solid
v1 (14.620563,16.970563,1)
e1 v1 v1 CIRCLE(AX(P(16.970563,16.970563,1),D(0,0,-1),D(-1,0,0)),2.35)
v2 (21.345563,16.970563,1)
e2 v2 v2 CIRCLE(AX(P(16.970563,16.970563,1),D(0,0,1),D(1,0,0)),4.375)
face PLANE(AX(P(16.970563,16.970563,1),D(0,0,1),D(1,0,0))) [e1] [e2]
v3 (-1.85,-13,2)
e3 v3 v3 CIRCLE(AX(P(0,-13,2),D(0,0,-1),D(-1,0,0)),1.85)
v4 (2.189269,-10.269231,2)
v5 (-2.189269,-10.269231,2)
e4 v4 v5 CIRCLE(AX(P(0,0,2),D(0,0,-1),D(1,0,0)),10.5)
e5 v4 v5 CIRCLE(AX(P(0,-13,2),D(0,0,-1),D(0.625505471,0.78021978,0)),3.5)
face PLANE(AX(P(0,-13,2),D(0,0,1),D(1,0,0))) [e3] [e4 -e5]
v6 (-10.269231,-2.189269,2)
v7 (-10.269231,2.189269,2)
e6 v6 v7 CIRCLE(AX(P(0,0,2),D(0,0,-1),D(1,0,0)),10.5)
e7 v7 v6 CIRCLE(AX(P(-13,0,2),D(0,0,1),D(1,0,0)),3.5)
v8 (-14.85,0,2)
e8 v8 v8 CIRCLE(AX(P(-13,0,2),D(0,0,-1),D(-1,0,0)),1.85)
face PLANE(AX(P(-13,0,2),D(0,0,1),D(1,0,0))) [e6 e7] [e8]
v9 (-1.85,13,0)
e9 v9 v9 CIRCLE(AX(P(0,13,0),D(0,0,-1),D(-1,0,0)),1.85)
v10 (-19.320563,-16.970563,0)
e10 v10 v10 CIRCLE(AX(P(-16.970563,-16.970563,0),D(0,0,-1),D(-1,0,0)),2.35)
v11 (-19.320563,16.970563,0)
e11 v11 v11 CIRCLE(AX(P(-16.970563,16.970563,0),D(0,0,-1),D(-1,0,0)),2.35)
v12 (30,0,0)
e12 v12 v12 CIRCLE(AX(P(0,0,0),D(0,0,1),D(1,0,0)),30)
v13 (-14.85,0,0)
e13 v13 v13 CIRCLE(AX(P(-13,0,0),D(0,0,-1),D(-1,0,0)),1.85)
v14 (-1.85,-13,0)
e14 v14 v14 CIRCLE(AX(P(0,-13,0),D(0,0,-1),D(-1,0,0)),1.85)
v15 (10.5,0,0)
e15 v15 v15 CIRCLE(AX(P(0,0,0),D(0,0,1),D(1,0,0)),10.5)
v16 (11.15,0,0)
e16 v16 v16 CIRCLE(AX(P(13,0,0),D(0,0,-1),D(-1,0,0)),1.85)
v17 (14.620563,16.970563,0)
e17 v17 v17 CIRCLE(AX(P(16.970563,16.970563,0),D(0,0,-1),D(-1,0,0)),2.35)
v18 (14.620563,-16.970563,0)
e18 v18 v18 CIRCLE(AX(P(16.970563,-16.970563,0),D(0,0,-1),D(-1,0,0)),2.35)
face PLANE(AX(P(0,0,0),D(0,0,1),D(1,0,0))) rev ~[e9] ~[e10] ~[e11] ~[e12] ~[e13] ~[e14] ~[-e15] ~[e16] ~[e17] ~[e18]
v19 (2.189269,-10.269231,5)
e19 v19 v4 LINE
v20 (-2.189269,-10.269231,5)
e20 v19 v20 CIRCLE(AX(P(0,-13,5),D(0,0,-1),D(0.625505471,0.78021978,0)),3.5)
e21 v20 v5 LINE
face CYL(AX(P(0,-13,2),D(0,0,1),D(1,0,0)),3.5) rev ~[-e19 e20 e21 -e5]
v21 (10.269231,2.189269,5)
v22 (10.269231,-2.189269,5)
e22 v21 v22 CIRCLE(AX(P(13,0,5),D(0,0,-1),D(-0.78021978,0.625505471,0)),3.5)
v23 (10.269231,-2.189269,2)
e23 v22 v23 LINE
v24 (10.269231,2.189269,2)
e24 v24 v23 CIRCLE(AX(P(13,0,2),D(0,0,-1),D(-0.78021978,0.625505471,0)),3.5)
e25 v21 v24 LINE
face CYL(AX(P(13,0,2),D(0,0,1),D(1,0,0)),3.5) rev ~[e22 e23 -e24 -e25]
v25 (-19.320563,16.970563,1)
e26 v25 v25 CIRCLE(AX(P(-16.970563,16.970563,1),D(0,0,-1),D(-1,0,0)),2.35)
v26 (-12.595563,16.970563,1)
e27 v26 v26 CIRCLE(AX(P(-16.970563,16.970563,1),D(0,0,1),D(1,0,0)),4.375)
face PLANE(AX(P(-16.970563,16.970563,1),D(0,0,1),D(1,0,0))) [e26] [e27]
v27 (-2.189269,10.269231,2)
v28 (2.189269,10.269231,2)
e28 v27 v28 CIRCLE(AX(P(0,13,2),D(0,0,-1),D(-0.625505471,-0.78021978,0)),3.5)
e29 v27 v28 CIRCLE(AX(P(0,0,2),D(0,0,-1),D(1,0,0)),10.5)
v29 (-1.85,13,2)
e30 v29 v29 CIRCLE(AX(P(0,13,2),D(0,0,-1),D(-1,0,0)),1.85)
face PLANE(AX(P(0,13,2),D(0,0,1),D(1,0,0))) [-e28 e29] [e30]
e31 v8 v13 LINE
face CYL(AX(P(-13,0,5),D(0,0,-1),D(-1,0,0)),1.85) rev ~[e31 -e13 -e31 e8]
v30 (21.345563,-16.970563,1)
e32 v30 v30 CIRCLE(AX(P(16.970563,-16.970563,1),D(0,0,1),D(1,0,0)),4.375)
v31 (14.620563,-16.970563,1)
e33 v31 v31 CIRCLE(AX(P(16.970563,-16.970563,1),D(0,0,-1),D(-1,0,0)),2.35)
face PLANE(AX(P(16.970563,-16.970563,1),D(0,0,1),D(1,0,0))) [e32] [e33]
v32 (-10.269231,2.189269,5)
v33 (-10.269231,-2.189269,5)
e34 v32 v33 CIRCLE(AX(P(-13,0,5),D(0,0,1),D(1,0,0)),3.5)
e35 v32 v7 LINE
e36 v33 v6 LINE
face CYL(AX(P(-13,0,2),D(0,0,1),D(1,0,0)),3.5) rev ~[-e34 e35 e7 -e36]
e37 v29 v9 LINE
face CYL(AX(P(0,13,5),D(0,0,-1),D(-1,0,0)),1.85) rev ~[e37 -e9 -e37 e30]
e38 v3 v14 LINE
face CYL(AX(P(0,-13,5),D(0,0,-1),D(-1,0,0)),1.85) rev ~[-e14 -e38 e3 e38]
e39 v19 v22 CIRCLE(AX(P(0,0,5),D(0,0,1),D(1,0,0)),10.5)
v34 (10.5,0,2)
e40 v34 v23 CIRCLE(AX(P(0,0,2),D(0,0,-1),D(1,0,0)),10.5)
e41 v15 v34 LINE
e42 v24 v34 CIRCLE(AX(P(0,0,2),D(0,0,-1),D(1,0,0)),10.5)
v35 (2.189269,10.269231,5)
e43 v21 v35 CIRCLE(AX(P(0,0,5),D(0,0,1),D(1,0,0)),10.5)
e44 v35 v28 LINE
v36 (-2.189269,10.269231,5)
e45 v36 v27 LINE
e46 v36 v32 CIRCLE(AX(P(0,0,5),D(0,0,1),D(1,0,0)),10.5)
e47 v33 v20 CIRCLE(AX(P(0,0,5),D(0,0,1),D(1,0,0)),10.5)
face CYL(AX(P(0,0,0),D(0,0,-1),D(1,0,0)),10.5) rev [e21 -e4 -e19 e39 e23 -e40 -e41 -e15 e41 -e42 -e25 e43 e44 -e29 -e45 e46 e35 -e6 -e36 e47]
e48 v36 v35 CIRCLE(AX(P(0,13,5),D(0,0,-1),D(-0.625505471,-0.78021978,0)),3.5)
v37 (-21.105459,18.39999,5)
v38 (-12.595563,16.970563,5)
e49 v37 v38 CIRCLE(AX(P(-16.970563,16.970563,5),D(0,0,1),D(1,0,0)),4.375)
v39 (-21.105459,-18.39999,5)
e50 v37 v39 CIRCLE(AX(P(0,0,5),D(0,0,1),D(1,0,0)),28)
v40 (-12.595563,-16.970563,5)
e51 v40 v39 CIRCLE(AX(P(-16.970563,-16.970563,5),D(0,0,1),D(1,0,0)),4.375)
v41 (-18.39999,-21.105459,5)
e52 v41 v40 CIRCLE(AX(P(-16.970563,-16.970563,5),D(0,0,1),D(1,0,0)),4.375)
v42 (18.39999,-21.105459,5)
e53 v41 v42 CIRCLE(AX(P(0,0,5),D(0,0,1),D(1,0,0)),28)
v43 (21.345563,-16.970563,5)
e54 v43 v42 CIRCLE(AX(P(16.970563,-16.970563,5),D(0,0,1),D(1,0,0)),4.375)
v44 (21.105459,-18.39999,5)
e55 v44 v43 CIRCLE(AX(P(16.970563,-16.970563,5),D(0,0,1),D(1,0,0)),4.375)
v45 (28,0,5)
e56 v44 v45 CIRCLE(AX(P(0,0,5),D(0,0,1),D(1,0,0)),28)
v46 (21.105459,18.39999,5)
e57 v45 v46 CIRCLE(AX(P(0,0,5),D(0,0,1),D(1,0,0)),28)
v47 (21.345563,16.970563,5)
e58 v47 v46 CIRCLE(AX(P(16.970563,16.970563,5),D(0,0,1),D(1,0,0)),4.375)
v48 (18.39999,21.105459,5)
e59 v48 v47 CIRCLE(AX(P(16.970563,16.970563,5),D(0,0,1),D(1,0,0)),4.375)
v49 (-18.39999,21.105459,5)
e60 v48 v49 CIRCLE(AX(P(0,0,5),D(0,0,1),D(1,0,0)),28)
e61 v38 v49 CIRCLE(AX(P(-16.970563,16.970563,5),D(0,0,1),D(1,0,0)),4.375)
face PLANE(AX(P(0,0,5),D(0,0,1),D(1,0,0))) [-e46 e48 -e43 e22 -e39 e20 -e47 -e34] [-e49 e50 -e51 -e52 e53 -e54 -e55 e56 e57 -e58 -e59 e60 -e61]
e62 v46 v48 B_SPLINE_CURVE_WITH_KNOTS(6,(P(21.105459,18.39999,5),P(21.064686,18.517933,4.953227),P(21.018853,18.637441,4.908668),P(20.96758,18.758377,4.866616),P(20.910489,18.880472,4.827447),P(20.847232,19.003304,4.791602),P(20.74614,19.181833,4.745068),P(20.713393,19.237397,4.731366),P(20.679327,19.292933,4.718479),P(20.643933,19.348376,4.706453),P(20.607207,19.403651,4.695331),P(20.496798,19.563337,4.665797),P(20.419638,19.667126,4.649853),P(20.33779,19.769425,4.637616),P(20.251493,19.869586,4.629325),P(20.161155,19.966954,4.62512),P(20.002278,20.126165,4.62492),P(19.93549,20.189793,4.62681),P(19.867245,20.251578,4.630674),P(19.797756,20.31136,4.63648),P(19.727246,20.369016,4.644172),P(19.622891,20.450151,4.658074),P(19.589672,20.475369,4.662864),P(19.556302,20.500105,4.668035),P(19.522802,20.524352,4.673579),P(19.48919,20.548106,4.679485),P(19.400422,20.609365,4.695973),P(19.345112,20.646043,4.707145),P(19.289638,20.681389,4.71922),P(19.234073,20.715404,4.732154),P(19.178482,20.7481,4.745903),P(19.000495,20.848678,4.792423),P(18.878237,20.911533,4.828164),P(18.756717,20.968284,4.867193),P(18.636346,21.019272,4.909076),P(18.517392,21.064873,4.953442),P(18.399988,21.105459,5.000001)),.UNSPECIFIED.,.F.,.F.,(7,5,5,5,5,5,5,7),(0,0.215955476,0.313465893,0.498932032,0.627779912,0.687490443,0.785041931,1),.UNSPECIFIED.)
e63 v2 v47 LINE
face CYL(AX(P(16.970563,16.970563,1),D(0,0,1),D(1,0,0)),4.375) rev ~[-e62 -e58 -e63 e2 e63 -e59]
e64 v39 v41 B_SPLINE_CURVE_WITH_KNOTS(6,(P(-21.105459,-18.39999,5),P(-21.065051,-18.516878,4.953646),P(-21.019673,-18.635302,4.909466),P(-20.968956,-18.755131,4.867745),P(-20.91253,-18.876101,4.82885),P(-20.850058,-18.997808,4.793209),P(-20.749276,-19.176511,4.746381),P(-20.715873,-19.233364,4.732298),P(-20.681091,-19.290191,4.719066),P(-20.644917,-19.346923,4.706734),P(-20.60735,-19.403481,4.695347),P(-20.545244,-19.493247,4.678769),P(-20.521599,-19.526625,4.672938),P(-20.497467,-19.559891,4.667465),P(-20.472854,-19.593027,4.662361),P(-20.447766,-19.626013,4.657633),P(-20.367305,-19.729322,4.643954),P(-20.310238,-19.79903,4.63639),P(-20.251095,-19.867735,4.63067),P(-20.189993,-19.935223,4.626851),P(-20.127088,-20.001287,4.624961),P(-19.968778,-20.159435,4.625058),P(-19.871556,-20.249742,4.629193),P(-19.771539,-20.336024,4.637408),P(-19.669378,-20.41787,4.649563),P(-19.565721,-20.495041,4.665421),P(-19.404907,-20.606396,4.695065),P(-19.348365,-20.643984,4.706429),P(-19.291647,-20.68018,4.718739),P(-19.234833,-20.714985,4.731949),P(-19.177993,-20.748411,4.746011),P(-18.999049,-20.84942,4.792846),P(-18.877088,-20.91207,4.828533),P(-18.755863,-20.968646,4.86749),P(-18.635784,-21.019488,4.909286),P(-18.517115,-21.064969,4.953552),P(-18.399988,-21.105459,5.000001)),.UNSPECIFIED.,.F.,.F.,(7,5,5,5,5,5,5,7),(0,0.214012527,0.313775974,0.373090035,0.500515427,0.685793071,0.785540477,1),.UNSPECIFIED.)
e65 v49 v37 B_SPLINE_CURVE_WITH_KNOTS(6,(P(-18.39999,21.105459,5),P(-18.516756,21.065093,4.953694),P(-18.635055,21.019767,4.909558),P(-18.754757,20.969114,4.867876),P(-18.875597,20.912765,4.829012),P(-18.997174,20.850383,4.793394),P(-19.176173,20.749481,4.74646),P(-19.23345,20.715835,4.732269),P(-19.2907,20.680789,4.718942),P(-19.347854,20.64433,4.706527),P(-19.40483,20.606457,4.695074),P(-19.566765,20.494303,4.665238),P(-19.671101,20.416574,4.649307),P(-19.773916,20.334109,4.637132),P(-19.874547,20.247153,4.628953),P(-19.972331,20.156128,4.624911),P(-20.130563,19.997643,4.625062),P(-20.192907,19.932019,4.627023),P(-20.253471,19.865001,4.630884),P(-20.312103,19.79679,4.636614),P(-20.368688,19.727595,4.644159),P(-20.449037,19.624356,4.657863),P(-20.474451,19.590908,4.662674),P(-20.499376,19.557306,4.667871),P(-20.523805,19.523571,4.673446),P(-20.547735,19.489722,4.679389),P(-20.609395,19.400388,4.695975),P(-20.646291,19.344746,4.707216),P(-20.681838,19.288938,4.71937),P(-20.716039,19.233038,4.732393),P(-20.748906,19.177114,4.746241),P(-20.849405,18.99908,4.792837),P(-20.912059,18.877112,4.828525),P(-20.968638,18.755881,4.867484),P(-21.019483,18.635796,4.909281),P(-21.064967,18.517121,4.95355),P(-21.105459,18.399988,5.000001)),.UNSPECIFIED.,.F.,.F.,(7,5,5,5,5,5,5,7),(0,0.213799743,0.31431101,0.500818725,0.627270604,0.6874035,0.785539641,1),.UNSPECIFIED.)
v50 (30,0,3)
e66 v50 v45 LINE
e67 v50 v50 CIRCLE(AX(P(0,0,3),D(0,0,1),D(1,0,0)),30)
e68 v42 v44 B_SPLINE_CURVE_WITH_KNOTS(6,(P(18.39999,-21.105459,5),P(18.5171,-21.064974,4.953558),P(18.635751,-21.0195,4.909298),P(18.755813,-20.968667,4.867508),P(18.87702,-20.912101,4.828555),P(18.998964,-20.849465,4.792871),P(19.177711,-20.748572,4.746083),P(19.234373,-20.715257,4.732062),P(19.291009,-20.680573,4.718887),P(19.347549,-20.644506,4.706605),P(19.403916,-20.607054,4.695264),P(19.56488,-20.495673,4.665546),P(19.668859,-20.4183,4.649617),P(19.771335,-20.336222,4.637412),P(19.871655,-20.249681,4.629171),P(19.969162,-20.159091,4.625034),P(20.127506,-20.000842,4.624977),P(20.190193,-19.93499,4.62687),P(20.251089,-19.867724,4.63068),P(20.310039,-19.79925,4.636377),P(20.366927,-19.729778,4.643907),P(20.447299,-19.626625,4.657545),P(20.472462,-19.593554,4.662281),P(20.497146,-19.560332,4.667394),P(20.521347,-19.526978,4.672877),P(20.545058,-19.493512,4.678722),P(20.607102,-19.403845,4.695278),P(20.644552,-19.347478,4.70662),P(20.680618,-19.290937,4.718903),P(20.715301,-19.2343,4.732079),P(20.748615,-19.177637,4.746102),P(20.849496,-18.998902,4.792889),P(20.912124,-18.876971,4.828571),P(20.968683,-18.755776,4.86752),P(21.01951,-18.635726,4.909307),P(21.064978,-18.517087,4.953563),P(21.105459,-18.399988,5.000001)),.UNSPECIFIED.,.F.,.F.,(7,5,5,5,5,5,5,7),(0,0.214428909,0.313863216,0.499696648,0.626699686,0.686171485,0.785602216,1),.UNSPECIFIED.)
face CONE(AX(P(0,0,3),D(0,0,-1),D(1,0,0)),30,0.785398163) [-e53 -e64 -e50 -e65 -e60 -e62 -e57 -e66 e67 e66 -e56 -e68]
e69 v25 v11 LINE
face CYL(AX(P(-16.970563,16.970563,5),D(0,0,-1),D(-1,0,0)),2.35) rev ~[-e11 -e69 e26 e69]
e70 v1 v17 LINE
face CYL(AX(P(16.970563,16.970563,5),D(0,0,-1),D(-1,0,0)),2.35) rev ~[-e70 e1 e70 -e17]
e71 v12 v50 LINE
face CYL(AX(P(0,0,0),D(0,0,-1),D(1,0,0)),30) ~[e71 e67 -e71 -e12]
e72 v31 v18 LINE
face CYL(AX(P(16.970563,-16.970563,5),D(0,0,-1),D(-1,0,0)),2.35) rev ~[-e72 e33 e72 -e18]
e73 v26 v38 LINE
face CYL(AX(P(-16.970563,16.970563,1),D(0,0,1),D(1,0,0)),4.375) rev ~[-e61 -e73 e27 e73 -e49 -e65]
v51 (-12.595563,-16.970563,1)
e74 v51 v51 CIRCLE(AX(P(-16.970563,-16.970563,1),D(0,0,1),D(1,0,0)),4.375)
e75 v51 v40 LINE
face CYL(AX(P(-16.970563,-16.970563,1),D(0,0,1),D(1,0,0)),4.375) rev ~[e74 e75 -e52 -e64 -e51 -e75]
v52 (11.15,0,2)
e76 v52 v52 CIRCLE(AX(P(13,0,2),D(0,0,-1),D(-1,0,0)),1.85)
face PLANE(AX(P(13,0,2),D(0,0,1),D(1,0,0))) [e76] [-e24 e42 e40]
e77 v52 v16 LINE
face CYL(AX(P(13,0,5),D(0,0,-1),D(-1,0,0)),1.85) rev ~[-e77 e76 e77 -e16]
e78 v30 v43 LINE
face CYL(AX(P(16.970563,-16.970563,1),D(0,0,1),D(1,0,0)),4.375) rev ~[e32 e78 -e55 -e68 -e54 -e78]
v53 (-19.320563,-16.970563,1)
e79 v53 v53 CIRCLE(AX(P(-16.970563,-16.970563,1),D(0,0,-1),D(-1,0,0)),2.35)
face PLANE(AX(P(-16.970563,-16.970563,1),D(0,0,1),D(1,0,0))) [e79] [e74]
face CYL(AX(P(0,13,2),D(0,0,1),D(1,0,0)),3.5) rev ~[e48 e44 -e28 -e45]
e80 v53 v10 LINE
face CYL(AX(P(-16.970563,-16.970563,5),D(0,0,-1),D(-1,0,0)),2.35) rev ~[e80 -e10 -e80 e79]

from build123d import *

# Parameters (mm, degrees)
F0_R           = 30
F0_R_2         = 10.5
F1_DEPTH       = 5
F3_D           = 4.7
F3_CBORE_D     = 8.75
F3_CBORE_DEPTH = 4
F5_D           = 3.7
F5_CBORE_D     = 7
F5_CBORE_DEPTH = 3


# Not quite as in the source:
# - a fillet or chamfer that OpenCascade refuses, or shapes differently, is made with other operations: its cross-section is extruded or revolved along the edge and cut away or added


with BuildPart() as f1:
    # F0 (on Top) → F1 (new body)
    with BuildSketch(Plane.XY):
        Circle(F0_R)
        Circle(F0_R_2, mode=Mode.SUBTRACT)
    extrude(amount=F1_DEPTH)

    # F3 (through all)
    with Locations(Plane.XY.offset(5)):
        with Locations((-16.9705627485, 16.9705627485), (16.9705627485, 16.9705627485), (16.9705627485, -16.9705627485), (-16.9705627485, -16.9705627485)):
            CounterBoreHole(F3_D / 2, F3_CBORE_D / 2, F3_CBORE_DEPTH)

    # F5 (through all)
    with Locations(Plane.XY.offset(5)):
        with Locations((0, 13), (-13, 0), (0, -13), (13, 0)):
            CounterBoreHole(F5_D / 2, F5_CBORE_D / 2, F5_CBORE_DEPTH)

    # F6: chamfer of 2 on 1 edges, made by hand

    # F6_s1 → F6_t2 (revolve, cut)
    with BuildSketch(Plane.XZ):
        Polygon((30, 3), (28, 5), (30, 5), align=None)
    revolve(axis=Axis((0, 0, 5), (0, 0, 1)), mode=Mode.SUBTRACT)


solid = f1.part
